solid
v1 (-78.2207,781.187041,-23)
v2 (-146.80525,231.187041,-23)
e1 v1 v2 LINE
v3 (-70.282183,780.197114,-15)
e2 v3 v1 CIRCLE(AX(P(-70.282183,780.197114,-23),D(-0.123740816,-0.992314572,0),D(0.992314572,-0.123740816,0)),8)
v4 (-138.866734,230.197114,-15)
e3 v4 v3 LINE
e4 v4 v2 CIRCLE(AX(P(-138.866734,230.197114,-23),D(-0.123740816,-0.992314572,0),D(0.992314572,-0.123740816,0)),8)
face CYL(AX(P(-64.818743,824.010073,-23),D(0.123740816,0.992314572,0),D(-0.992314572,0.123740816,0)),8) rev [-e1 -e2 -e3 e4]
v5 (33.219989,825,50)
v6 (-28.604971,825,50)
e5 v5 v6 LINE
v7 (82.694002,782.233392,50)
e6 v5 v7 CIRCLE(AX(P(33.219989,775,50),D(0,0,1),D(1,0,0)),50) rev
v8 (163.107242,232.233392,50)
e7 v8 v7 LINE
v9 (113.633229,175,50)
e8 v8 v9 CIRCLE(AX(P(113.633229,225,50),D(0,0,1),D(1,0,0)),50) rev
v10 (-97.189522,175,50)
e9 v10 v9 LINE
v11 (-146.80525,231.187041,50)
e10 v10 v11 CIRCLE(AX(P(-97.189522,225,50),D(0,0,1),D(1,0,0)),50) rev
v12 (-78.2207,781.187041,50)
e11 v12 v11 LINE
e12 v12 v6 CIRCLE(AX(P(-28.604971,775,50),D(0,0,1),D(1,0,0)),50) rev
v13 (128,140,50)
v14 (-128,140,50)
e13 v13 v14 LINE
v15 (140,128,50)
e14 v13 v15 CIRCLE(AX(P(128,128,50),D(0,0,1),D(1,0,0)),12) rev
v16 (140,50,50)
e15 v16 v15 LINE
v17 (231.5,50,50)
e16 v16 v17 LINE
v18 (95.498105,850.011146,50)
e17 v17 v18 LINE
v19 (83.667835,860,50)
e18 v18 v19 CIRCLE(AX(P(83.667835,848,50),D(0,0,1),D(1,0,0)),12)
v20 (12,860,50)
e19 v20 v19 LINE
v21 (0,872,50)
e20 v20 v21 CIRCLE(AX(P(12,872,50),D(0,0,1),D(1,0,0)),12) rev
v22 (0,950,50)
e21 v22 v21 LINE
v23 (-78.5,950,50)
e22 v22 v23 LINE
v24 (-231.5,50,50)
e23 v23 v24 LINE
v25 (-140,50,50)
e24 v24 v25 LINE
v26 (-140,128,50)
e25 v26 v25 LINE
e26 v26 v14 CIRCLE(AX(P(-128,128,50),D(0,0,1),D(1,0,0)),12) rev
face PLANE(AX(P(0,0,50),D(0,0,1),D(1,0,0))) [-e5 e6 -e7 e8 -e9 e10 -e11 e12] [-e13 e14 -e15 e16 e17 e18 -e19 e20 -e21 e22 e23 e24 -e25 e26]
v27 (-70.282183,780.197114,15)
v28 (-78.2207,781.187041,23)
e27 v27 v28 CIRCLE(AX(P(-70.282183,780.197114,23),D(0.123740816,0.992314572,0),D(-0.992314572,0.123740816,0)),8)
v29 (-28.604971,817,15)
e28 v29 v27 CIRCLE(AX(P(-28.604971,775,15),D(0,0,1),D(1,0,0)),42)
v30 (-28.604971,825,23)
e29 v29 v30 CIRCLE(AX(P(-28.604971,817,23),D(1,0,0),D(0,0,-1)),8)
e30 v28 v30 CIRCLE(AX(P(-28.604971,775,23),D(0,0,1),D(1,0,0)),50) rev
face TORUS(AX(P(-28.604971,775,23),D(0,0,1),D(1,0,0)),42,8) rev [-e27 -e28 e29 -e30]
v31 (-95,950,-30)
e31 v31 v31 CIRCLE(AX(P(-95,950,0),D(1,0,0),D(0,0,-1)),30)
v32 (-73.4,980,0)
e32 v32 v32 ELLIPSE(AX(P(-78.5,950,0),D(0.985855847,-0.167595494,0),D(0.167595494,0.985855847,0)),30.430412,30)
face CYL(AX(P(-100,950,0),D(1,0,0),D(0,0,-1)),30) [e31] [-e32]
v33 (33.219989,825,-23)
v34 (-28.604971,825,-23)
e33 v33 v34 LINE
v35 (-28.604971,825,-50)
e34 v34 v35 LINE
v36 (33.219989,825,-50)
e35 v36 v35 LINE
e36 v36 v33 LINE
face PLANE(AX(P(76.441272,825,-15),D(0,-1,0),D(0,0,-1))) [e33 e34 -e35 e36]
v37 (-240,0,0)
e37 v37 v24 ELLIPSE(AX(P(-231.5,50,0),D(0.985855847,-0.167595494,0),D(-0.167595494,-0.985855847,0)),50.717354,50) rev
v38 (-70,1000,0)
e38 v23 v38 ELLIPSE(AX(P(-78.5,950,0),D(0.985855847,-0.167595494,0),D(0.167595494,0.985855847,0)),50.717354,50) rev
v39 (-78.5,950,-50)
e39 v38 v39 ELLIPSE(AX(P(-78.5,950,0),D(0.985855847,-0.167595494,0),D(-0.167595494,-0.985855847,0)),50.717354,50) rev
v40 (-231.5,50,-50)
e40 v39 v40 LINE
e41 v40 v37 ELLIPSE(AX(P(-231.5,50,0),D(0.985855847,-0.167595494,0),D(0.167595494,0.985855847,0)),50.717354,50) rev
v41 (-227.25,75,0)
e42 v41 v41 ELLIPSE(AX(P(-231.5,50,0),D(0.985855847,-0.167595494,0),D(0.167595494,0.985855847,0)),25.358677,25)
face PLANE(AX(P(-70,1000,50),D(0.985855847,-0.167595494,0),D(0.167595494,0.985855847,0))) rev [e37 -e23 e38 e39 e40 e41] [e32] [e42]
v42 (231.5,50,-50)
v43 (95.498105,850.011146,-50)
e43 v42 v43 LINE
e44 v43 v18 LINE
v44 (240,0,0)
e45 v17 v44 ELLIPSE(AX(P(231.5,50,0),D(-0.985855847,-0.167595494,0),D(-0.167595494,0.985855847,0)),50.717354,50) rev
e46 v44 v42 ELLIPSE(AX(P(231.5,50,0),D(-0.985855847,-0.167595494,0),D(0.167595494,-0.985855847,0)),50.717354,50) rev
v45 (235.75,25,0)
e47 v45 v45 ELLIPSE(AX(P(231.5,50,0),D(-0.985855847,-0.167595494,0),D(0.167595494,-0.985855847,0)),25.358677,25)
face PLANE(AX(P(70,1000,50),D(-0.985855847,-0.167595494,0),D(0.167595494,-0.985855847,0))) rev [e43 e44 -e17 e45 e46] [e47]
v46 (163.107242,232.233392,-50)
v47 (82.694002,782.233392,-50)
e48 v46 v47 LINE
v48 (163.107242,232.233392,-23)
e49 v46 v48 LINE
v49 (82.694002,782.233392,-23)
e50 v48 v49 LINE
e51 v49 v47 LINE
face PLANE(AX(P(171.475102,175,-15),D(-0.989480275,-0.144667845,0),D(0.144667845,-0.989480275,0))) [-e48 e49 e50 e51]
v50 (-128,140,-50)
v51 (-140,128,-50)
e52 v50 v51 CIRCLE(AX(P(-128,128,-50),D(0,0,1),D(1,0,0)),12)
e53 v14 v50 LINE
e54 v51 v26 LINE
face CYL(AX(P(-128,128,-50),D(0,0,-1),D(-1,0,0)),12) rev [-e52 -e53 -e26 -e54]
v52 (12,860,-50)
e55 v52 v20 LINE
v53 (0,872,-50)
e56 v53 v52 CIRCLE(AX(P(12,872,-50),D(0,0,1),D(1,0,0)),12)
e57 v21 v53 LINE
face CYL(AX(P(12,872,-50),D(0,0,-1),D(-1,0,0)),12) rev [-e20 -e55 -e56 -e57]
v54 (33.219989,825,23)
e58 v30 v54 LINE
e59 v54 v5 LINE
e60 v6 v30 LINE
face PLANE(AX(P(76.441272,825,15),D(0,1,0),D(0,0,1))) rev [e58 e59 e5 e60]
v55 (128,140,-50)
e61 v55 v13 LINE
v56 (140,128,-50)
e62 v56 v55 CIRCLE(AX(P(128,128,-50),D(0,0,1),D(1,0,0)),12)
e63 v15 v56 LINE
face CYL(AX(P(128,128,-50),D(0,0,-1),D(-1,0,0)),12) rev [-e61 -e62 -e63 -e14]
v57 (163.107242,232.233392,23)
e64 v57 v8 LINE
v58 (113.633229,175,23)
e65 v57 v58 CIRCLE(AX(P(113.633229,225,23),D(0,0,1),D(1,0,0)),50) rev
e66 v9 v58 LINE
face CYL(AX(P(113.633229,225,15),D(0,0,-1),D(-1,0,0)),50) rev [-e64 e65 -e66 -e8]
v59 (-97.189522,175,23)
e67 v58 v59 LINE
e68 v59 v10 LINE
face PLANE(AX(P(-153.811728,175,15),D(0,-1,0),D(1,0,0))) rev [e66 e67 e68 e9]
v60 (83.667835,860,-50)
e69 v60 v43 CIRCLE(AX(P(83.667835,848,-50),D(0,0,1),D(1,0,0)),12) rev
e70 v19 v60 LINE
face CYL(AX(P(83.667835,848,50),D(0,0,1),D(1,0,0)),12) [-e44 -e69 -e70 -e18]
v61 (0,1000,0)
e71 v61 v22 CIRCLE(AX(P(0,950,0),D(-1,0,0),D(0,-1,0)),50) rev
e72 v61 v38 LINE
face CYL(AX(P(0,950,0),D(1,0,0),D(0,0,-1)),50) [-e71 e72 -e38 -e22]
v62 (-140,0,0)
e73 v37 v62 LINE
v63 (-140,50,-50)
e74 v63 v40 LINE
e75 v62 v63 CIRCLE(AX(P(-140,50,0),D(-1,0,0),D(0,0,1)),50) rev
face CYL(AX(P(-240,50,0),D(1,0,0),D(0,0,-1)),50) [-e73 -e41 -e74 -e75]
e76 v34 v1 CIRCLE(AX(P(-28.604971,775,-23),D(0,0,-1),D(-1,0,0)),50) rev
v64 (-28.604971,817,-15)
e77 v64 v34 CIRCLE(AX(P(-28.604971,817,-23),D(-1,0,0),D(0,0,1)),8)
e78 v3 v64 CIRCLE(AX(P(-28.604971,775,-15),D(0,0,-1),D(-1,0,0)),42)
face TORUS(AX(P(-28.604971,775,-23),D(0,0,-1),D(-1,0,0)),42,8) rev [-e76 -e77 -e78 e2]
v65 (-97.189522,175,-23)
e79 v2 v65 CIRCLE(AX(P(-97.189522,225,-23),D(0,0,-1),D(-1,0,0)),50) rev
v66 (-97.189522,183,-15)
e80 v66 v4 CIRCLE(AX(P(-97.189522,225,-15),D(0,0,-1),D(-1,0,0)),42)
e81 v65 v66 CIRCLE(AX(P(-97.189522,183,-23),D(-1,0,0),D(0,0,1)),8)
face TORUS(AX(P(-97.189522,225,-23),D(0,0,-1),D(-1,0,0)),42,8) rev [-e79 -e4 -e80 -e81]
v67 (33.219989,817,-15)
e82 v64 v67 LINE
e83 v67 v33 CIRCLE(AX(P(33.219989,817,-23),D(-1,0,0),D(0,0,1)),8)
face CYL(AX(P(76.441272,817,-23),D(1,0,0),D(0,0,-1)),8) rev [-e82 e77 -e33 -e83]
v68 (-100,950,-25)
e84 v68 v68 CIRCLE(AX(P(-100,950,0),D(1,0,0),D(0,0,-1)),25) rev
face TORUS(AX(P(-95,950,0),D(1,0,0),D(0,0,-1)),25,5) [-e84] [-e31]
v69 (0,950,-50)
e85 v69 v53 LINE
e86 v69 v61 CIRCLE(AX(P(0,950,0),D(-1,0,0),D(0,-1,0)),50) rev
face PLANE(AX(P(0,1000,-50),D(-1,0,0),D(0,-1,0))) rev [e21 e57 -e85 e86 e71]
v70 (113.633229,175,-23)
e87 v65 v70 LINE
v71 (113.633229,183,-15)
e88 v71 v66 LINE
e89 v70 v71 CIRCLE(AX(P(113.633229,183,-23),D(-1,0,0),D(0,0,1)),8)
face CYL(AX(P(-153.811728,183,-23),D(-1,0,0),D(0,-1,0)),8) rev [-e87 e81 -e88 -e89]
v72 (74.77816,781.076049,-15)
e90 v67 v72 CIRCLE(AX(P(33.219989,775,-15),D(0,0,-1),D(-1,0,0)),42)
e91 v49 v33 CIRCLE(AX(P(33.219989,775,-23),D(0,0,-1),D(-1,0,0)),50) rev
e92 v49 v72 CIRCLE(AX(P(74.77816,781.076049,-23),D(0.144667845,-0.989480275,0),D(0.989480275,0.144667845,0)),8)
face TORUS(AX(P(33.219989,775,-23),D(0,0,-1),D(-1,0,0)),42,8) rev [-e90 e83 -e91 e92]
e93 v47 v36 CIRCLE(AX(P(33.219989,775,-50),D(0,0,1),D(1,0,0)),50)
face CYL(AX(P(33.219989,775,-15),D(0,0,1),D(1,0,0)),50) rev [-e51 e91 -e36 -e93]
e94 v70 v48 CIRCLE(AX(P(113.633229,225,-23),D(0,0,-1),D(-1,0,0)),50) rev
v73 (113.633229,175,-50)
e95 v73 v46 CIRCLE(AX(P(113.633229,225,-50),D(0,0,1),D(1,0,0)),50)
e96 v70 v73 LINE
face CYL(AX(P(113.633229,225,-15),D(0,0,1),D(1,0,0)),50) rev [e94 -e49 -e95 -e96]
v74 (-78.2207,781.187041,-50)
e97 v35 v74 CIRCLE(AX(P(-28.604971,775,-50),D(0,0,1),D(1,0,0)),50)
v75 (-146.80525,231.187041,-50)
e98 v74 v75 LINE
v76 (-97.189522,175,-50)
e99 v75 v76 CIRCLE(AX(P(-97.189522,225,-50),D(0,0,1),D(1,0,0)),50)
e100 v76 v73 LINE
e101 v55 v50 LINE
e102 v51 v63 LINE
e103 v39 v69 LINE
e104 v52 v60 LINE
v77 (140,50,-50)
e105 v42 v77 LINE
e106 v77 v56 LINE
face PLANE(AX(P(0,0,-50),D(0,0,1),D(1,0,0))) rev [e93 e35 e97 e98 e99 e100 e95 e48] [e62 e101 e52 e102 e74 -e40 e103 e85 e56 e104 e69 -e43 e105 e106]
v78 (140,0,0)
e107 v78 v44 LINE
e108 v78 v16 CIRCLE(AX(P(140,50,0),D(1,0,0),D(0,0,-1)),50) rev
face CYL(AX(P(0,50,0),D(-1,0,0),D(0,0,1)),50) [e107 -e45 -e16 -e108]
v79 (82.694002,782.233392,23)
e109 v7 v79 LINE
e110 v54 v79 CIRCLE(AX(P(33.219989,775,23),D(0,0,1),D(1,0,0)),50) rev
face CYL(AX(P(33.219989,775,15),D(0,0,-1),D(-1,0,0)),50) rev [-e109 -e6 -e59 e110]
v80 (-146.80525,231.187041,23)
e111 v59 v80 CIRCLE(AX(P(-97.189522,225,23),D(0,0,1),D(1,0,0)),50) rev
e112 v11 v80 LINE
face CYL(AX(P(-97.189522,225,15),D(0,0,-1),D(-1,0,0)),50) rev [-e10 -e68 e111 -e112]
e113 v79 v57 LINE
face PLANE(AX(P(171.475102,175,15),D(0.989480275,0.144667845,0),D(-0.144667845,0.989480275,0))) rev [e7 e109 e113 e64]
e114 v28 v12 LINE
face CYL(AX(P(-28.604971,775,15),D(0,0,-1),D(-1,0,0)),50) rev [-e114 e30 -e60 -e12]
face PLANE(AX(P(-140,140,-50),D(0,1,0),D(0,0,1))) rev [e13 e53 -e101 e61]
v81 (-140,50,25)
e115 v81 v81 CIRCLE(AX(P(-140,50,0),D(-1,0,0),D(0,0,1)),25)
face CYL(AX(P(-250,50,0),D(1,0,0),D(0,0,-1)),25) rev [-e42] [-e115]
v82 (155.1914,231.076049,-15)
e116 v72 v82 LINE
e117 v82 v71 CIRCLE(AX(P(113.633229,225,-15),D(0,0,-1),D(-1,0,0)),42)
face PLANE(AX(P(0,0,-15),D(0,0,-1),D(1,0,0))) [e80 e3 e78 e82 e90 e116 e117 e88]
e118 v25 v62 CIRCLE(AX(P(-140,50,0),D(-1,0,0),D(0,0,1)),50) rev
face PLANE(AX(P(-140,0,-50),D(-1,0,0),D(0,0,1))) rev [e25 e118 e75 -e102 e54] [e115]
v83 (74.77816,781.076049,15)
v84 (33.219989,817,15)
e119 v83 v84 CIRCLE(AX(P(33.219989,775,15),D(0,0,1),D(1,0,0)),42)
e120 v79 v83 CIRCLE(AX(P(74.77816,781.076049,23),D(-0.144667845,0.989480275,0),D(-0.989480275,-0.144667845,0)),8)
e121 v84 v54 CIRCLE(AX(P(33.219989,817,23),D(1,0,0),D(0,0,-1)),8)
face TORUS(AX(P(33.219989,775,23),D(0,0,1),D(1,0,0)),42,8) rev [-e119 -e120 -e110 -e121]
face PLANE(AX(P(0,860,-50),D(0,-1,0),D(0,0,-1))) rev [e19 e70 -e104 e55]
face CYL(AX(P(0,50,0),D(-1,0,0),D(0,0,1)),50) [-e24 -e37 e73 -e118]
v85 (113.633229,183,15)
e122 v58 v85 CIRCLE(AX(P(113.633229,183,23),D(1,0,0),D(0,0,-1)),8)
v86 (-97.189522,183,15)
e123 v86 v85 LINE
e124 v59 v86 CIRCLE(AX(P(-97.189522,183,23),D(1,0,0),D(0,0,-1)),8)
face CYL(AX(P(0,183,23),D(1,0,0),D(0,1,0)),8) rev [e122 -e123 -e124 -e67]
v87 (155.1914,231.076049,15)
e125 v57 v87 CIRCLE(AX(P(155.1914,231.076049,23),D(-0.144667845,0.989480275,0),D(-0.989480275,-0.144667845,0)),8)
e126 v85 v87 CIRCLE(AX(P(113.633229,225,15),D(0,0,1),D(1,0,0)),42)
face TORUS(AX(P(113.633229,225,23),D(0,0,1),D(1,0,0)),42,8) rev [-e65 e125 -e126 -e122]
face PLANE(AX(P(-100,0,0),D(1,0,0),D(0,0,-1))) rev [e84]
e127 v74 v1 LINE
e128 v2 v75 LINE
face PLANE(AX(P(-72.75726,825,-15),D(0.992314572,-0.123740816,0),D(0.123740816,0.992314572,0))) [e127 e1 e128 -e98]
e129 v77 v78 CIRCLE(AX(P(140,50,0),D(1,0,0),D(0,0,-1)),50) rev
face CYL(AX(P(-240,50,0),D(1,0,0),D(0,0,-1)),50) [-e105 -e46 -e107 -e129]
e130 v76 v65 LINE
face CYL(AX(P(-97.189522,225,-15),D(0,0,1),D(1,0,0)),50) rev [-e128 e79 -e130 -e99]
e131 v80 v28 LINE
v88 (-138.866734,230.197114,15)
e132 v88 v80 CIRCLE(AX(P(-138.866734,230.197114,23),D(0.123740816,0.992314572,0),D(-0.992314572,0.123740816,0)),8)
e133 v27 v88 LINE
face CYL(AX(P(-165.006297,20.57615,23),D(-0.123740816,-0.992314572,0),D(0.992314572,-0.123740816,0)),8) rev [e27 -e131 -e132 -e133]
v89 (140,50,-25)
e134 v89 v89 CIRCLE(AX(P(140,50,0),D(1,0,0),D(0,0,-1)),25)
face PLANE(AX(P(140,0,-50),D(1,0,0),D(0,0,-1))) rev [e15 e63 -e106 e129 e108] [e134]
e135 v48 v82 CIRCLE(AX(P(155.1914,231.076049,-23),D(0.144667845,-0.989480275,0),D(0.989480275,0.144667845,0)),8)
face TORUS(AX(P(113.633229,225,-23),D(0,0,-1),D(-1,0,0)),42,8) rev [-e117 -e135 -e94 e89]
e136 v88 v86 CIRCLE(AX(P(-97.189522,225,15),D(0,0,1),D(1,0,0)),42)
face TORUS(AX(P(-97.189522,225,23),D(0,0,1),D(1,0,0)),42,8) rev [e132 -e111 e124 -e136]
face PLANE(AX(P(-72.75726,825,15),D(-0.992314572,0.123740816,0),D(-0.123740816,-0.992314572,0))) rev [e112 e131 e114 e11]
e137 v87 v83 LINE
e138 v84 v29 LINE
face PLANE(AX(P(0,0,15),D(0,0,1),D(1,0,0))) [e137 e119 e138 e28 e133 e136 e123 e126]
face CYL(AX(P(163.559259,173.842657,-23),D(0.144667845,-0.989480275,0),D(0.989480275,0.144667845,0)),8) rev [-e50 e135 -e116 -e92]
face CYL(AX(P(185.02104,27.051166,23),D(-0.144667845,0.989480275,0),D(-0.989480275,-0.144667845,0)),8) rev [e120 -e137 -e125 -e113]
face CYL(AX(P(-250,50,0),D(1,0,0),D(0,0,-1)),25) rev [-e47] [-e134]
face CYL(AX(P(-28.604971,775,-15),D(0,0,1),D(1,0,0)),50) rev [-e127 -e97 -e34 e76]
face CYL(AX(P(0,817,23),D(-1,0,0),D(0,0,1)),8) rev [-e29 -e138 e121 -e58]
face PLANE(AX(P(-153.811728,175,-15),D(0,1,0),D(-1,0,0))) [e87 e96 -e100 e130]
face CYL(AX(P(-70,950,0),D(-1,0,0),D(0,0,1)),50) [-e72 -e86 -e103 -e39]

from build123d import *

# Parameters (mm, degrees)
BOSS_EXTRUDE1_DEPTH     = 50
FILLET1_R               = 50
CUT_EXTRUDE2_DEPTH      = 1030.611577246
CUT_EXTRUDE2_DEPTH_BACK = 1030.611577246
SKETCH4_W               = 280
SKETCH4_H               = 140
SKETCH4_W_2             = 94
SKETCH5_R               = 30
BOSS_EXTRUDE2_DEPTH     = 100
FILLET2_R               = 5
FILLET3_R               = 12
CUT_EXTRUDE4_DEPTH      = 35
FILLET4_R               = 50
FILLET5_R               = 8
FILLET4_OF_MIRROR1_R    = 50
FILLET5_OF_MIRROR1_R    = 8
SKETCH7_R               = 25
CUT_EXTRUDE5_DEPTH      = 250


with BuildPart() as part:
    # Sketch1 → Boss-Extrude1 (new, symmetric)
    with BuildSketch(Plane.XY):
        Polygon((-240, 0), (240, 0), (70, 1000), (-70, 1000), align=None)
    extrude(amount=BOSS_EXTRUDE1_DEPTH, both=True)

    # Fillet1
    fillet1_edges = [part.edges().sort_by_distance(p)[0] for p in [
        (0, 1000, 50),
        (0, 1000, -50),
        (0, 0, 50),
        (0, 0, -50),
    ]]
    fillet(fillet1_edges, radius=FILLET1_R - 0.0001)  # a hair under: the kernel refuses the full size

    # Sketch4 → Cut-Extrude2 (cut, two sides: drawn at the far end of the back side and taken through both)
    with BuildSketch(Plane.XY.offset(-CUT_EXTRUDE2_DEPTH_BACK)):
        with Locations((0, 70)):
            Rectangle(SKETCH4_W, SKETCH4_H)
        with Locations((47, 930)):
            Rectangle(SKETCH4_W_2, SKETCH4_H)
    extrude(amount=CUT_EXTRUDE2_DEPTH + CUT_EXTRUDE2_DEPTH_BACK, mode=Mode.SUBTRACT)

    # Sketch5 → Boss-Extrude2 (add)
    with BuildSketch(Plane(origin=(0, 0, 0), x_dir=(0, 0, -1), z_dir=(1, 0, 0))):
        with Locations((0, 950)):
            Circle(SKETCH5_R)
    extrude(amount=-BOSS_EXTRUDE2_DEPTH)

    # Fillet2
    fillet2_edges = [part.edges().sort_by_distance(p)[0] for p in [
        (-100, 950, 30),
    ]]
    fillet(fillet2_edges, radius=FILLET2_R)

    # Fillet3
    fillet3_edges = [part.edges().sort_by_distance(p)[0] for p in [
        (-140, 140, 0),
        (140, 140, 0),
        (93.8, 860, 0),
        (0, 860, 0),
    ]]
    fillet(fillet3_edges, radius=FILLET3_R)

    # Sketch6 → Cut-Extrude4 (cut)
    with BuildSketch(Plane.XY.offset(50)):
        Polygon((76.441272438, 825), (-72.757259745, 825), (-153.811728433, 175), (171.475101543, 175), align=None)
    cut_extrude4 = extrude(amount=-CUT_EXTRUDE4_DEPTH, mode=Mode.SUBTRACT)

    # Fillet4
    fillet4_edges = [part.edges().sort_by_distance(p)[0] for p in [
        (76.441272438, 825, 32.5),
        (171.475101543, 175, 32.5),
        (-153.811728433, 175, 32.5),
        (-72.757259745, 825, 32.5),
    ]]
    fillet(fillet4_edges, radius=FILLET4_R)

    # Fillet5
    fillet5_edges = [part.edges().sort_by_distance(p)[0] for p in [
        (122.900622431, 507.233392258, 15),
        (8.221853466, 175, 15),
        (2.307508674, 825, 15),
        (-112.512975158, 506.187040802, 15),
        (-61.700650501, 812.479007725, 15),
        (65.918080265, 812.826377126, 15),
        (-134.668529482, 191.904320827, 15),
        (151.459605814, 192.301908411, 15),
    ]]
    fillet(fillet5_edges, radius=FILLET5_R)

    # Mirror1: Cut-Extrude4 across plane
    add(cut_extrude4.mirror(Plane.XY), mode=Mode.SUBTRACT)

    # Fillet4 of Mirror1
    fillet4_of_mirror1_edges = [part.edges().sort_by_distance(p)[0] for p in [
        (76.441272438, 825, -32.5),
        (171.475101543, 175, -32.5),
        (-153.811728433, 175, -32.5),
        (-72.757259745, 825, -32.5),
    ]]
    fillet(fillet4_of_mirror1_edges, radius=FILLET4_OF_MIRROR1_R)

    # Fillet5 of Mirror1
    fillet5_of_mirror1_edges = [part.edges().sort_by_distance(p)[0] for p in [
        (122.900622431, 507.233392258, -15),
        (8.221853466, 175, -15),
        (2.307508674, 825, -15),
        (-112.512975158, 506.187040802, -15),
        (-61.700650501, 812.479007725, -15),
        (65.918080265, 812.826377126, -15),
        (-134.668529482, 191.904320827, -15),
        (151.459605814, 192.301908411, -15),
    ]]
    fillet(fillet5_of_mirror1_edges, radius=FILLET5_OF_MIRROR1_R)

    # Sketch7 → Cut-Extrude5 (cut, symmetric)
    with BuildSketch(Plane(origin=(0, 0, 0), x_dir=(0, 0, -1), z_dir=(1, 0, 0))):
        with Locations((0, 50)):
            Circle(SKETCH7_R)
    extrude(amount=CUT_EXTRUDE5_DEPTH, both=True, mode=Mode.SUBTRACT)


solid = part.part
